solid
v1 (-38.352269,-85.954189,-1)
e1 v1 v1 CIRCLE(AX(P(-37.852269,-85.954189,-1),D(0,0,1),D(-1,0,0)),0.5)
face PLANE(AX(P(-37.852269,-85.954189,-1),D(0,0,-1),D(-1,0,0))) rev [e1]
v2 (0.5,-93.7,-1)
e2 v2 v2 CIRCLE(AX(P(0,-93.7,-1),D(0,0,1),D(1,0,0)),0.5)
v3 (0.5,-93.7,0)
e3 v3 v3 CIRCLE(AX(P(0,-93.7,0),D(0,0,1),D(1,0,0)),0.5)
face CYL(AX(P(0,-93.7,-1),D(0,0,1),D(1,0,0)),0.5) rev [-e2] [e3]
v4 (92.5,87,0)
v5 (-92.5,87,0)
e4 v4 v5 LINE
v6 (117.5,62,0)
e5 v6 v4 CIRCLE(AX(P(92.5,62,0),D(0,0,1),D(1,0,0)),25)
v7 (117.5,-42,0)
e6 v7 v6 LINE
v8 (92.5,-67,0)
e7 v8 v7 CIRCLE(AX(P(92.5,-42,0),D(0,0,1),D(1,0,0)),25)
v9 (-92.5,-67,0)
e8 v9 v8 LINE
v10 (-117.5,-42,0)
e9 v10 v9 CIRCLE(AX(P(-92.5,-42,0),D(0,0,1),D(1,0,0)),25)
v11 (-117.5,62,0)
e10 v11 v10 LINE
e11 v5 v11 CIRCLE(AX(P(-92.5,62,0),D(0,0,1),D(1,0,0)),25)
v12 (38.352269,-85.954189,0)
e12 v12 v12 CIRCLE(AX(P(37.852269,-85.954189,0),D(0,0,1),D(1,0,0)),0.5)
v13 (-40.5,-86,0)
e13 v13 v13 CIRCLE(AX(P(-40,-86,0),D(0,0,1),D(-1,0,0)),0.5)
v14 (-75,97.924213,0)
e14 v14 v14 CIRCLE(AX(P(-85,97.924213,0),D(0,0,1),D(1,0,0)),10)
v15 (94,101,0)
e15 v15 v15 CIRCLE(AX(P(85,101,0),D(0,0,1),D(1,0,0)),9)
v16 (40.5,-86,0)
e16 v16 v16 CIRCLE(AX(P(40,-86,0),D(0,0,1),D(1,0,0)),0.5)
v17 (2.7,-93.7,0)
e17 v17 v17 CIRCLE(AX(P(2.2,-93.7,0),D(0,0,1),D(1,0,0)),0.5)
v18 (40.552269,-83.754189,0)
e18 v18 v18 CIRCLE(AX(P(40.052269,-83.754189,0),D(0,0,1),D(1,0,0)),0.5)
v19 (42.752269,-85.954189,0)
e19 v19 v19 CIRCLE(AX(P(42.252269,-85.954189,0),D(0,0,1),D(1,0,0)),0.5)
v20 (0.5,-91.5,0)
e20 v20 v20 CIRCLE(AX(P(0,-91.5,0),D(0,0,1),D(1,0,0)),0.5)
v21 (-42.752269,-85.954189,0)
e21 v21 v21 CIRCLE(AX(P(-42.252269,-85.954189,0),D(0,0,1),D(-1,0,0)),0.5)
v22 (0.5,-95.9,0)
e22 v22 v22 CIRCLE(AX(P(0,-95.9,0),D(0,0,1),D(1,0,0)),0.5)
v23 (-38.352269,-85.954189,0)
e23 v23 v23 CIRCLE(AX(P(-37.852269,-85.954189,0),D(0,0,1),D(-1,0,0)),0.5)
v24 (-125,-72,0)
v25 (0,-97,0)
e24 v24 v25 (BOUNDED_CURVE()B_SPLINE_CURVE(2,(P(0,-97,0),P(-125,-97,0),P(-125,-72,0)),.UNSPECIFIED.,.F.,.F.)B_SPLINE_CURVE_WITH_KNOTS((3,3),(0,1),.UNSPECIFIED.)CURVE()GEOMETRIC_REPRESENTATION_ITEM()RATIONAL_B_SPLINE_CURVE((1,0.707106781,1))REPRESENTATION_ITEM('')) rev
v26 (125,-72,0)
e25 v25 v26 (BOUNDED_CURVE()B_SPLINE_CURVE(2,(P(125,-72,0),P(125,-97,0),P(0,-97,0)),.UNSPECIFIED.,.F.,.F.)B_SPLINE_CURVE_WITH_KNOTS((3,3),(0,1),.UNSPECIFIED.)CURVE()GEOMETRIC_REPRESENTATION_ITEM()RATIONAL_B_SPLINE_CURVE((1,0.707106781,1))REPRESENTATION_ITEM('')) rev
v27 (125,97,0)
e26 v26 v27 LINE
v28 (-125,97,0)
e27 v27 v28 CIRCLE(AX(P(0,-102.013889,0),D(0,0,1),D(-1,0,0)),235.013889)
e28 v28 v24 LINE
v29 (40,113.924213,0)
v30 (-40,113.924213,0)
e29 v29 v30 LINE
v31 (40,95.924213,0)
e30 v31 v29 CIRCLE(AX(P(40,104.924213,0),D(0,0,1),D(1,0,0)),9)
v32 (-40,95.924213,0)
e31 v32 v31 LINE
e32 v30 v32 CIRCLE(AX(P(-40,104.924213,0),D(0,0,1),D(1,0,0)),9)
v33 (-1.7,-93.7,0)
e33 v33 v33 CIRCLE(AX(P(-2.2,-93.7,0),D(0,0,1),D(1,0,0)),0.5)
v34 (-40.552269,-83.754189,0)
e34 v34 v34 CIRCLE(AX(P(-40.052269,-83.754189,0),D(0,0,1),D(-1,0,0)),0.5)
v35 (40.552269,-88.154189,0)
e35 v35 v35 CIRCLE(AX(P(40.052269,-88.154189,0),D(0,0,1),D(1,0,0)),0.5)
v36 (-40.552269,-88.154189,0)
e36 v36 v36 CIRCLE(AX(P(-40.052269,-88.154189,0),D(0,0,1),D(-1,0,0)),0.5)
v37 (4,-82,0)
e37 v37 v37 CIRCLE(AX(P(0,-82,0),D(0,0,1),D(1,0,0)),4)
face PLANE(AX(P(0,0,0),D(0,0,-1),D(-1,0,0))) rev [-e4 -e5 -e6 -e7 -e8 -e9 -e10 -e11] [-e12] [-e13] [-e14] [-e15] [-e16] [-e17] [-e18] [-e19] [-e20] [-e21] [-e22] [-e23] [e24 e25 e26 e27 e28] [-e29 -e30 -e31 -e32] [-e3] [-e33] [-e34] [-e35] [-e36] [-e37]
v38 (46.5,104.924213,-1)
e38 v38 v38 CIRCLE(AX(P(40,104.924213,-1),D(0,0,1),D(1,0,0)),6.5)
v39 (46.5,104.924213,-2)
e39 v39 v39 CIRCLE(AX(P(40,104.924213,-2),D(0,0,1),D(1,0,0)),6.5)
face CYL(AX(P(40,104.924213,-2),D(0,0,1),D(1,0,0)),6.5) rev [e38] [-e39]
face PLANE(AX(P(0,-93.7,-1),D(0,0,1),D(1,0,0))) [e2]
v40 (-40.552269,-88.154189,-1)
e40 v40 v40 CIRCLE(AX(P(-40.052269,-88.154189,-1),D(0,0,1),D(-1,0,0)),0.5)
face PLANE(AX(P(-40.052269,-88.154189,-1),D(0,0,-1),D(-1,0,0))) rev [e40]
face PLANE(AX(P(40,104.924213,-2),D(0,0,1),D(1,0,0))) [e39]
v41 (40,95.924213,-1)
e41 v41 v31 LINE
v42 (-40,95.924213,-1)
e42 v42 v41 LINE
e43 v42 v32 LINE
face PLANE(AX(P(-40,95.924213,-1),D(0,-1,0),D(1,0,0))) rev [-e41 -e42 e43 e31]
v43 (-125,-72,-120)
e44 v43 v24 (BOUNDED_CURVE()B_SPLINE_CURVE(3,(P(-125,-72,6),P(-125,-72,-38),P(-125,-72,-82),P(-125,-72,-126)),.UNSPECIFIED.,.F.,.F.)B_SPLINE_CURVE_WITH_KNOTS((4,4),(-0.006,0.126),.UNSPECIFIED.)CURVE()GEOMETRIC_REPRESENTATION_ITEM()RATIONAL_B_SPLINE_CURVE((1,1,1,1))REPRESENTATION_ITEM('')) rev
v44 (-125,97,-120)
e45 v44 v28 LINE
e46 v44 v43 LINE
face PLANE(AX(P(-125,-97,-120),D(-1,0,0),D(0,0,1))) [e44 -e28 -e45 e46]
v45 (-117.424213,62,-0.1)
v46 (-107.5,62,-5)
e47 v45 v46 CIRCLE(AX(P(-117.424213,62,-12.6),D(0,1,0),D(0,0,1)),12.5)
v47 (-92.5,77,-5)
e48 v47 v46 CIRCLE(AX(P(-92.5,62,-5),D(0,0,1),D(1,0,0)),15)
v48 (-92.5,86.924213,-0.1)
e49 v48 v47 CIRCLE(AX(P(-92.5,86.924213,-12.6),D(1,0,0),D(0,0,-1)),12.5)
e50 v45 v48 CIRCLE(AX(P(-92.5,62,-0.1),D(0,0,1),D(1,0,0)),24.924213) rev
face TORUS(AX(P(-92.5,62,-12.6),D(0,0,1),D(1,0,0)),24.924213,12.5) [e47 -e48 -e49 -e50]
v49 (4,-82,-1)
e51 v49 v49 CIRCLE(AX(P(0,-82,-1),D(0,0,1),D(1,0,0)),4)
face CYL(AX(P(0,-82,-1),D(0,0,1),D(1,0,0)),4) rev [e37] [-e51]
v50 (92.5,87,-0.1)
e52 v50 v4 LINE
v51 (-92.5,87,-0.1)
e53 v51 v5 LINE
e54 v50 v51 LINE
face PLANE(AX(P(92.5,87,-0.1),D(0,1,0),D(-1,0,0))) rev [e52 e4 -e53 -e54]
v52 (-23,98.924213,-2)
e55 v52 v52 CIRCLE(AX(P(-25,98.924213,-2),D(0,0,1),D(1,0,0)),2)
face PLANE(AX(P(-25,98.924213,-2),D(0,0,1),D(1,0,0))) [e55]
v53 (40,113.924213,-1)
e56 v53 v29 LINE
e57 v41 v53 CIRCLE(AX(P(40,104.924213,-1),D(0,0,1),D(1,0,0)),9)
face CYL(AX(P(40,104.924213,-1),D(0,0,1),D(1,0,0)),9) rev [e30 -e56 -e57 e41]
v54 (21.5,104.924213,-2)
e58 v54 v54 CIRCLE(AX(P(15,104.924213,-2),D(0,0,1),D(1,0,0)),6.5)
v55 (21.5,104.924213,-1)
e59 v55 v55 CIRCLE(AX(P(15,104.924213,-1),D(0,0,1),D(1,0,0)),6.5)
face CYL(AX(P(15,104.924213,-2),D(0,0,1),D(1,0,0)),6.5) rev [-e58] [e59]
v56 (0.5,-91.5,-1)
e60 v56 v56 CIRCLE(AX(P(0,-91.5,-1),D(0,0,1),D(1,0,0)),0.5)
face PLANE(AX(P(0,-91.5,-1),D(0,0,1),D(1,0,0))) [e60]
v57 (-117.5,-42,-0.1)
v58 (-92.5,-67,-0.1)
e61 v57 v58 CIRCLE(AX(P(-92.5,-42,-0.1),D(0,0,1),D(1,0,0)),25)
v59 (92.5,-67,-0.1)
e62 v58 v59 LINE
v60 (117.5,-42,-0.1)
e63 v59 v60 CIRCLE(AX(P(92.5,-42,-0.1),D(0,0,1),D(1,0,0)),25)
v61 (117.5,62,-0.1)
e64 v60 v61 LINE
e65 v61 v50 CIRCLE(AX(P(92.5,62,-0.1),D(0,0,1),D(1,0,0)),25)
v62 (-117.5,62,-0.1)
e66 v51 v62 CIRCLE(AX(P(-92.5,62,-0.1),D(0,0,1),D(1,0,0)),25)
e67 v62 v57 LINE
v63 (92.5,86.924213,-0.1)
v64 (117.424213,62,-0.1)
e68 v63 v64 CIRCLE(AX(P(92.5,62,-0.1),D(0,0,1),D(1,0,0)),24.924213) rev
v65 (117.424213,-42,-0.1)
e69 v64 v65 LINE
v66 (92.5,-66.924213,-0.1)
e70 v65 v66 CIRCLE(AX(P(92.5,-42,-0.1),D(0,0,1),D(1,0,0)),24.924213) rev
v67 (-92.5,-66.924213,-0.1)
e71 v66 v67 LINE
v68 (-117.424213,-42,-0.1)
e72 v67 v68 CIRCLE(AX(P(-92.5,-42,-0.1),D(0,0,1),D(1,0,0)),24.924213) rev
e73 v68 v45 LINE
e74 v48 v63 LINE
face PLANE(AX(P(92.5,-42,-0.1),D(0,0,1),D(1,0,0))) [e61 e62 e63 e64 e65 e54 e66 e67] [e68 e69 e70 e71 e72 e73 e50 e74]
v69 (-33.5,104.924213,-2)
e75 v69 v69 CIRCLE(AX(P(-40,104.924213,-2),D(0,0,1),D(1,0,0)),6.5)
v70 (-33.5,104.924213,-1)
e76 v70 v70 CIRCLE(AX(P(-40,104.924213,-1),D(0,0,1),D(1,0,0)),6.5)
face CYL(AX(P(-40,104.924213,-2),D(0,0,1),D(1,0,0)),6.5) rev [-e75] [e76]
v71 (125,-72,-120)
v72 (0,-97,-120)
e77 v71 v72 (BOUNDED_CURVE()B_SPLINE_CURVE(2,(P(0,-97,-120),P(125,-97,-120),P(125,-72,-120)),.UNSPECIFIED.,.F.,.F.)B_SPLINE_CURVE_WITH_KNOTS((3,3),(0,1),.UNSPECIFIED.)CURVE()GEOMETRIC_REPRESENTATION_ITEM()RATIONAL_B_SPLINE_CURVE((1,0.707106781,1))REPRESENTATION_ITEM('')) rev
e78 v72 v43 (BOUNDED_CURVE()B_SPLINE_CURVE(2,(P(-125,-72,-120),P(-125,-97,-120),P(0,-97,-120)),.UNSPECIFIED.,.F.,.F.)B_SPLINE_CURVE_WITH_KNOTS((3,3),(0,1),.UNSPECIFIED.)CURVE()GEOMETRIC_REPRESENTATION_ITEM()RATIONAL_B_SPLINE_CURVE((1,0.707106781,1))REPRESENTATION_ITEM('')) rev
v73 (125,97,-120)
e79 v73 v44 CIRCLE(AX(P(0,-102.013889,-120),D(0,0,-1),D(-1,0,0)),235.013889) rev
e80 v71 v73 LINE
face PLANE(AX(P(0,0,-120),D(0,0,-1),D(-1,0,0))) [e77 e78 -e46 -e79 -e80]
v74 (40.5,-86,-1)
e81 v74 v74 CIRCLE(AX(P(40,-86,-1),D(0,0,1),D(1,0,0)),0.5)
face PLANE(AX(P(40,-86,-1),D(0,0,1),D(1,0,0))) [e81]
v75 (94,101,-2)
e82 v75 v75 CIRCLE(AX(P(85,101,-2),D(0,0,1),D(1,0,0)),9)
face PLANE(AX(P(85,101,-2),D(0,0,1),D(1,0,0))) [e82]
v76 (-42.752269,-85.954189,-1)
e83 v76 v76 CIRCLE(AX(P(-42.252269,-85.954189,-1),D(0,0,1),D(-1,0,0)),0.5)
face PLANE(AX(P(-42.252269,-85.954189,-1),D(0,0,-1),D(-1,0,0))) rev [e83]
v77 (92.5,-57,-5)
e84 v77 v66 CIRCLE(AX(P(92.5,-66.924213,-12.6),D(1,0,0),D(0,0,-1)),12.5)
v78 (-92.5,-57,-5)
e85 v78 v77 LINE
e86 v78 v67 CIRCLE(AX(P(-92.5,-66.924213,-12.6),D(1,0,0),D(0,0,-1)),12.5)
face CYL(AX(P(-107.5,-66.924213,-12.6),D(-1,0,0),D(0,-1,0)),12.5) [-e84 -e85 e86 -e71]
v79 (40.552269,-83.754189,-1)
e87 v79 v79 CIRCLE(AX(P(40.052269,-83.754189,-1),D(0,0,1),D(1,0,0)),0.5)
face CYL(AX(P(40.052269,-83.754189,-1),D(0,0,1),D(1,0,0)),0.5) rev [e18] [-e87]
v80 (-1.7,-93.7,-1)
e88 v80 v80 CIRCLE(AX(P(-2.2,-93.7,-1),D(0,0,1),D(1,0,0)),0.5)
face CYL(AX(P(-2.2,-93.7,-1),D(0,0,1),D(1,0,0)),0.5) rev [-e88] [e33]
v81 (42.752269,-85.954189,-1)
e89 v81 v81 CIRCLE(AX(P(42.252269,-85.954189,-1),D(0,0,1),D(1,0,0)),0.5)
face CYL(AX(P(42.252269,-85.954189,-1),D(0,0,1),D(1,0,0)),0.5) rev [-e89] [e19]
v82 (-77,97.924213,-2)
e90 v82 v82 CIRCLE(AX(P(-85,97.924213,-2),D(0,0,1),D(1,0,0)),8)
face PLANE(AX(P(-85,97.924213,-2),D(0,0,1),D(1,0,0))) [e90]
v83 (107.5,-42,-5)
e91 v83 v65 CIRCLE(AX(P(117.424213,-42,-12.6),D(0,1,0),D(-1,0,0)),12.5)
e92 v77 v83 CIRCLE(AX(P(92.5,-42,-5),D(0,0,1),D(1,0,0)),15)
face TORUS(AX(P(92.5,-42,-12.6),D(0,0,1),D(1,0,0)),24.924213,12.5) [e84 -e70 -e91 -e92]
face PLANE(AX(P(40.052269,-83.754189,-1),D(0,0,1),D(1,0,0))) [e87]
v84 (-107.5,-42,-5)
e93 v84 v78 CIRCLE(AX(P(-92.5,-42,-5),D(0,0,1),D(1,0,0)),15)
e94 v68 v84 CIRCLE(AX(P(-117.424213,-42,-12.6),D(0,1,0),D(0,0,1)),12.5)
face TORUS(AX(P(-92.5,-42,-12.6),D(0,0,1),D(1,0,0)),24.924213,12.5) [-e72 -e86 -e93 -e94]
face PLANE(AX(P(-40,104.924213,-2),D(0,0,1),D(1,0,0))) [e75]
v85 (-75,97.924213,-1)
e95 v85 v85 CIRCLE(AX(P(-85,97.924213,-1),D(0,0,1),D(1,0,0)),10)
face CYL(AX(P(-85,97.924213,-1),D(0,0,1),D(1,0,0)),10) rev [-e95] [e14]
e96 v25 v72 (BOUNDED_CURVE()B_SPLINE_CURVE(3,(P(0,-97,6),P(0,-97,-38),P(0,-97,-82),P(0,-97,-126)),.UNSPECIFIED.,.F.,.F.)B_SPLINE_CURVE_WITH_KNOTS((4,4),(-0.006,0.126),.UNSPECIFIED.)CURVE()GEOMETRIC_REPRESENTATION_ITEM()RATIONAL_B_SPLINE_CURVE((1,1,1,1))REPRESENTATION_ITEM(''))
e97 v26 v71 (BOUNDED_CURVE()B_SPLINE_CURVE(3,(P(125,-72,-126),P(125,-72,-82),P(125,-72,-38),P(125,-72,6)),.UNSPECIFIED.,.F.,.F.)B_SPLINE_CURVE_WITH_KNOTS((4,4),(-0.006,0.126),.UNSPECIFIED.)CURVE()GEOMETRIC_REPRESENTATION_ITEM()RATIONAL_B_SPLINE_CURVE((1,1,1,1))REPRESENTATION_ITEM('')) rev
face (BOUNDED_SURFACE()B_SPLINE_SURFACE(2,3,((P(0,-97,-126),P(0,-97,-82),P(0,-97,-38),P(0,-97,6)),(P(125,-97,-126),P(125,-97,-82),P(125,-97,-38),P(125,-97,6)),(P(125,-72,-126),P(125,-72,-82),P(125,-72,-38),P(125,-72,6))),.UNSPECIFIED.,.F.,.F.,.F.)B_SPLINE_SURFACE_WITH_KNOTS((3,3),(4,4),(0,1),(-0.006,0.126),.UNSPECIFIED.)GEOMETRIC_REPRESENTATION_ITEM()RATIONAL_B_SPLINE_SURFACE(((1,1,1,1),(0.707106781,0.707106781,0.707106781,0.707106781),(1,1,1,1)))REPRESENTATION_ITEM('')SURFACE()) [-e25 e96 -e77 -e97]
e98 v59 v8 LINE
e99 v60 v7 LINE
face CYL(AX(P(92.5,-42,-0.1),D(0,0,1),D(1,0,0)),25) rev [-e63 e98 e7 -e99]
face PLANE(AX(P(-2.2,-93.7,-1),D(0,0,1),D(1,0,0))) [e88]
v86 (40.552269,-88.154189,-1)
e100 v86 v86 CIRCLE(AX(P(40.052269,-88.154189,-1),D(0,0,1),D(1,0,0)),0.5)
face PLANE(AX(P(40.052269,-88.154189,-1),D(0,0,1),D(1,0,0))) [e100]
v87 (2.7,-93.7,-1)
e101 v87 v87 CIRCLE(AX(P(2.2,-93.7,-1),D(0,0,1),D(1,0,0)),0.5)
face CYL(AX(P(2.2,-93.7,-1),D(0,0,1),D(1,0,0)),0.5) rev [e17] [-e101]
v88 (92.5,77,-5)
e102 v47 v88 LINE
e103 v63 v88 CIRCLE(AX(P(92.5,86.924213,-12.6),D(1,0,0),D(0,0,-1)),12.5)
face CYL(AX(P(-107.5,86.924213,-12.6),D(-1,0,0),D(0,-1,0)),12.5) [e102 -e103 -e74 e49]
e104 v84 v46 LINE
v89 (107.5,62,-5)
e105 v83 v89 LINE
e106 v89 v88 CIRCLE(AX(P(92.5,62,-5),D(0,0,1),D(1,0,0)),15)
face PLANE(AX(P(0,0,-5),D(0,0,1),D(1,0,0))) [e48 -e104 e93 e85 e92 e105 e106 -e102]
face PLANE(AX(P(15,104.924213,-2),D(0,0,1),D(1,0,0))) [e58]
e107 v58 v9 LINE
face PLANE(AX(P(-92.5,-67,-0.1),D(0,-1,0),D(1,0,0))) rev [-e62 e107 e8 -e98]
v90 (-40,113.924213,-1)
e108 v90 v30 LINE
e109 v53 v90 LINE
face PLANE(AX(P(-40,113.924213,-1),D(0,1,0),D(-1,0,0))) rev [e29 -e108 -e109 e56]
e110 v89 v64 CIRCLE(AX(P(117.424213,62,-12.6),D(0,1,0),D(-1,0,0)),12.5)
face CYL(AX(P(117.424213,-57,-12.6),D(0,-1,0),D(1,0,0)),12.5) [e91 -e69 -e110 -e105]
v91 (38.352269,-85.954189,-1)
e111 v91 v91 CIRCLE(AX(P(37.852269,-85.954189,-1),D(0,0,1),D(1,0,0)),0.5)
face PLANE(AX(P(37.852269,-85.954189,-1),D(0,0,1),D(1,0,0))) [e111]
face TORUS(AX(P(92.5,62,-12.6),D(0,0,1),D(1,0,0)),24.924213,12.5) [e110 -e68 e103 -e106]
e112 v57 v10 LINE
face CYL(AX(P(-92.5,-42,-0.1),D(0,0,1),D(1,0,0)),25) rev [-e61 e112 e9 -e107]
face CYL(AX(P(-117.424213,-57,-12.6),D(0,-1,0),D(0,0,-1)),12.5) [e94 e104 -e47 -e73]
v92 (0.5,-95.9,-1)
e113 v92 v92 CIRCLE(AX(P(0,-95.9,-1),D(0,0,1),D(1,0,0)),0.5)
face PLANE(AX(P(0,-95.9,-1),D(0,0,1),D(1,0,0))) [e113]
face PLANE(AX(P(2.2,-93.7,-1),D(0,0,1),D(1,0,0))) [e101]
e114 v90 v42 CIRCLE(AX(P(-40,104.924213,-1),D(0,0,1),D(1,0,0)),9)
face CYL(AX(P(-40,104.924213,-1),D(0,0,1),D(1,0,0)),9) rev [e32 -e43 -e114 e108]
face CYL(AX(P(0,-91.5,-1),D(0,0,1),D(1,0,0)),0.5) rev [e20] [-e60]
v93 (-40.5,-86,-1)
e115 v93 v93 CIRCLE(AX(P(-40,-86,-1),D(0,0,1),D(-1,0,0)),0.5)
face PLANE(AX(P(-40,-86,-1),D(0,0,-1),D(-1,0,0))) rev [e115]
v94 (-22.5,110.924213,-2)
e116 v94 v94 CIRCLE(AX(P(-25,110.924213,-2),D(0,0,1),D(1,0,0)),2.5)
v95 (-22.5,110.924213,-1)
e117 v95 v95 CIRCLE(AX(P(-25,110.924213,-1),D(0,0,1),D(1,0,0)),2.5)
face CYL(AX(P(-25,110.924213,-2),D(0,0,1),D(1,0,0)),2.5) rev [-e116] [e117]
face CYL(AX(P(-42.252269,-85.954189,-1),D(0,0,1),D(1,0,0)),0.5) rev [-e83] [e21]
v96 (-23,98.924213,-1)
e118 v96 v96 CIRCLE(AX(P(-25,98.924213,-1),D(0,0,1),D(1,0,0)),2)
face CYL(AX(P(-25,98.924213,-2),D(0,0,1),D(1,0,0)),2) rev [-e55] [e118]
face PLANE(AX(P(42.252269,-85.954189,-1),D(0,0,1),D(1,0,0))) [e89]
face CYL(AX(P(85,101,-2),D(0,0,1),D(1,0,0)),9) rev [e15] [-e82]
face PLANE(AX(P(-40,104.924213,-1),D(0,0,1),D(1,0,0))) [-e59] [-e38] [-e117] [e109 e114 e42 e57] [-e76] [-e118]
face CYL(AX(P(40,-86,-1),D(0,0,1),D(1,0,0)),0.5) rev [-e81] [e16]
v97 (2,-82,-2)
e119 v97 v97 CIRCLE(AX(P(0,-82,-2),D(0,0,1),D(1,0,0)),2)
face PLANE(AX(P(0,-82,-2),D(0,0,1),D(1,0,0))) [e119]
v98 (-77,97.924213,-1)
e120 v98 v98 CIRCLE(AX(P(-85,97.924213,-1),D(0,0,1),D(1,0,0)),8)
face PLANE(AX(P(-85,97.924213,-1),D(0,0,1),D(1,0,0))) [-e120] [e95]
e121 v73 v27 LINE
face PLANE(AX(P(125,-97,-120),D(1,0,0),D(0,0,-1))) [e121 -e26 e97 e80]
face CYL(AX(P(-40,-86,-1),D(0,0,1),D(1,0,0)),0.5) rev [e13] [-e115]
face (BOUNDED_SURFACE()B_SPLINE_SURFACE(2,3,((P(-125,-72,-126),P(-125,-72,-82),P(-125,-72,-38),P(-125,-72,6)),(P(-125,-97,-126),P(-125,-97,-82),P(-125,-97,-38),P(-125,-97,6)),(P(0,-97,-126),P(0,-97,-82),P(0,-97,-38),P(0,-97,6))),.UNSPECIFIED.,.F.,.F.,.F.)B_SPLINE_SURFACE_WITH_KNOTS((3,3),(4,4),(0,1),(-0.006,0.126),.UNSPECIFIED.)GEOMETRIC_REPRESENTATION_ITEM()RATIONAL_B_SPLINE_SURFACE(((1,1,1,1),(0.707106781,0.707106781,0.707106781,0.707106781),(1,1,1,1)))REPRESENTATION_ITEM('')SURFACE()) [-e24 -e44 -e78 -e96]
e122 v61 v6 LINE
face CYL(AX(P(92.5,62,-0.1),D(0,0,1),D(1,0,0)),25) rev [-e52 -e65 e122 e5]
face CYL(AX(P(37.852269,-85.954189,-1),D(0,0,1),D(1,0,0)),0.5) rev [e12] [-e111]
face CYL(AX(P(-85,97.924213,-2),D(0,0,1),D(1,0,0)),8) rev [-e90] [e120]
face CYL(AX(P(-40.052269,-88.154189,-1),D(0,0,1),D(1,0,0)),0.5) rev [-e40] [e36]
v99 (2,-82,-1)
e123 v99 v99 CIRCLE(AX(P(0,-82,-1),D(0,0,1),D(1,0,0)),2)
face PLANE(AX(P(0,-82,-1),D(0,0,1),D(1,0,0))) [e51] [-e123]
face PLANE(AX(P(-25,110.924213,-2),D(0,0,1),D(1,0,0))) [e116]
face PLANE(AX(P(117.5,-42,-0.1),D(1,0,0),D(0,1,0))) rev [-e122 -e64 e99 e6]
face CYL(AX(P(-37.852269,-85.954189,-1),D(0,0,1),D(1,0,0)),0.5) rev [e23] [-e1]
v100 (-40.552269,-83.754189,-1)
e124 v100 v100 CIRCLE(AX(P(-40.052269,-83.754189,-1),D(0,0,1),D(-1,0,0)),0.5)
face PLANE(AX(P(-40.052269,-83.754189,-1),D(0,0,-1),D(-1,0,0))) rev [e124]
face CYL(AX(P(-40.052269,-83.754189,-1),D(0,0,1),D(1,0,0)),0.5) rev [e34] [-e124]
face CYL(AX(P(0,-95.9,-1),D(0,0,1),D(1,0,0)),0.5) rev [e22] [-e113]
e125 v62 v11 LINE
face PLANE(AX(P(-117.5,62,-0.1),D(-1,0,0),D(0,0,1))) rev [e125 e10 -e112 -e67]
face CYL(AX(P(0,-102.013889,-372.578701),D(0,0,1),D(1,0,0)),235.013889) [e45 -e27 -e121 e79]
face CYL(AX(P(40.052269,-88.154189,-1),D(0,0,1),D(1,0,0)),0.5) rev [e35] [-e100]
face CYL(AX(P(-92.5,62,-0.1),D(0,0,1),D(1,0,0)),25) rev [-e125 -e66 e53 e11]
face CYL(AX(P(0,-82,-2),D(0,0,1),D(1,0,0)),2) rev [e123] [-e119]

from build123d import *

# Parameters (mm, degrees)
ESBO_O1_W                = 250
ESBO_O1_H                = 194
RESSALTO_EXTRUS_O1_DEPTH = 120
ESBO_O2_W                = 215
ESBO_O2_H                = 134
CORTE_EXTRUS_O1_DEPTH    = 5
FILETE1_R                = 15
RESSALTO_EXTRUS_O2_DEPTH = 120
CORTE_EXTRUS_O2_DEPTH    = 0.1
FILETE2_SIZE             = 125
FILETE2_SIZE_2           = 25
ESBO_O7_R                = 4
CORTE_EXTRUS_O3_DEPTH    = 1
ESBO_O8_R                = 2
CORTE_EXTRUS_O4_DEPTH    = 1
ESBO_O9_R                = 0.5
CORTE_EXTRUS_O5_DEPTH    = 1
FILETE4_R                = 12.5
ESBO_O10_R               = 10
CORTE_EXTRUS_O6_DEPTH    = 1
ESBO_O11_R               = 6.5
ESBO_O11_R_2             = 2.5
ESBO_O11_R_3             = 2
ESBO_O11_R_4             = 8
CORTE_EXTRUS_O7_DEPTH    = 1
ESBO_O14_R               = 9
CORTE_EXTRUS_O9_DEPTH    = 2


with BuildPart() as part:
    # Esboço1 → Ressalto-extrusão1 (new body)
    with BuildSketch(Plane.XY):
        Rectangle(ESBO_O1_W, ESBO_O1_H)
    extrude(amount=-RESSALTO_EXTRUS_O1_DEPTH)

    # Esboço2 → Corte-extrusão1 (cut)
    with BuildSketch(Plane.XY):
        with Locations((0, 10)):
            Rectangle(ESBO_O2_W, ESBO_O2_H)
    extrude(amount=-CORTE_EXTRUS_O1_DEPTH, mode=Mode.SUBTRACT)

    # Filete1
    filete1_edges = [part.edges().sort_by_distance(p)[0] for p in [
        (-107.5, 77, -2.5),
        (107.5, 77, -2.5),
        (107.5, -57, -2.5),
        (-107.5, -57, -2.5),
    ]]
    fillet(filete1_edges, radius=FILETE1_R)

    # Esboço3 → Ressalto-extrusão2 (add)
    with BuildSketch(Plane.XY):
        with BuildLine():
            Line((-125, 97), (125, 97))
            ThreePointArc((125, 97), (0, 133), (-125, 97))
        make_face()
    extrude(amount=-RESSALTO_EXTRUS_O2_DEPTH)

    # Esboço4 → Corte-extrusão2 (cut)
    with BuildSketch(Plane.XY):
        with BuildLine():
            Line((117.5, -42), (117.5, 62))
            ThreePointArc((117.5, 62), (110.17766953, 79.67766953), (92.5, 87))
            Line((92.5, 87), (-92.5, 87))
            ThreePointArc((-92.5, 87), (-110.17766953, 79.67766953), (-117.5, 62))
            Line((-117.5, 62), (-117.5, -42))
            ThreePointArc((-117.5, -42), (-110.17766953, -59.67766953), (-92.5, -67))
            Line((-92.5, -67), (92.5, -67))
            ThreePointArc((92.5, -67), (110.17766953, -59.67766953), (117.5, -42))
        make_face()
    extrude(amount=-CORTE_EXTRUS_O2_DEPTH, mode=Mode.SUBTRACT)

    # Filete2
    # a fillet whose section is not a circle: 125, 25 mm, written as the material it takes off along each edge
    with BuildSketch(Plane(origin=(125, -97, 312.5), x_dir=(-1, 0, 0), z_dir=(0, 0, -1))) as filete2_piece_1:
        with BuildLine():
            Bezier((FILETE2_SIZE, 0), (0, 0), (0, FILETE2_SIZE_2), weights=[1, 0.707106781, 1])
            Line((0, FILETE2_SIZE_2), (0, 0))
            Line((0, 0), (FILETE2_SIZE, 0))
        make_face()
    extrude(amount=745, mode=Mode.SUBTRACT)
    with BuildSketch(Plane(origin=(-125, -97, 312.5), x_dir=(1, 0, 0), z_dir=(0, 0, -1))) as filete2_piece_2:
        with BuildLine():
            Bezier((FILETE2_SIZE, 0), (0, 0), (0, -FILETE2_SIZE_2), weights=[1, 0.707106781, 1])
            Line((0, -FILETE2_SIZE_2), (0, 0))
            Line((0, 0), (FILETE2_SIZE, 0))
        make_face()
    extrude(amount=745, mode=Mode.SUBTRACT)

    # Esboço7 → Corte-extrusão3 (cut)
    with BuildSketch(Plane.XY):
        with Locations((0, -82)):
            Circle(ESBO_O7_R)
    extrude(amount=-CORTE_EXTRUS_O3_DEPTH, mode=Mode.SUBTRACT)

    # Esboço8 → Corte-extrusão4 (cut)
    with BuildSketch(Plane.XY.offset(-1)):
        with Locations((0, -82)):
            Circle(ESBO_O8_R)
    extrude(amount=-CORTE_EXTRUS_O4_DEPTH, mode=Mode.SUBTRACT)

    # Esboço9 → Corte-extrusão5 (cut)
    with BuildSketch(Plane.XY):
        with Locations((0, -91.5)):
            Circle(ESBO_O9_R)
        with Locations((0, -93.7)):
            Circle(ESBO_O9_R)
        with Locations((0, -95.9)):
            Circle(ESBO_O9_R)
        with Locations((2.2, -93.7)):
            Circle(ESBO_O9_R)
        with Locations((-2.2, -93.7)):
            Circle(ESBO_O9_R)
        with Locations((40.052268552, -83.754189239)):
            Circle(ESBO_O9_R)
        with Locations((40.052268552, -88.154189239)):
            Circle(ESBO_O9_R)
        with Locations((42.252268552, -85.954189239)):
            Circle(ESBO_O9_R)
        with Locations((37.852268552, -85.954189239)):
            Circle(ESBO_O9_R)
        with Locations((40, -86)):
            Circle(ESBO_O9_R)
        with Locations(Location((-42.252268552, -85.954189239, 0), (0, 0, 180))):
            Circle(ESBO_O9_R)
        with Locations(Location((-40.052268552, -83.754189239, 0), (0, 0, 180))):
            Circle(ESBO_O9_R)
        with Locations(Location((-40, -86, 0), (0, 0, 180))):
            Circle(ESBO_O9_R)
        with Locations(Location((-37.852268552, -85.954189239, 0), (0, 0, 180))):
            Circle(ESBO_O9_R)
        with Locations(Location((-40.052268552, -88.154189239, 0), (0, 0, 180))):
            Circle(ESBO_O9_R)
    extrude(amount=-CORTE_EXTRUS_O5_DEPTH, mode=Mode.SUBTRACT)

    # Filete4
    # the kernel refuses this fillet: 12.5 mm, written as the material it takes off along each edge
    with BuildSketch(Plane(origin=(92.5, 62, -0.1), x_dir=(0, 1, 0), z_dir=(-1, 0, 0))) as filete4_piece_1:
        with BuildLine():
            CenterArc((24.924212815, 12.5), FILETE4_R, 217.445030013, 52.554969987)
            Line((15, 4.9), (15, 0))
            Line((15, 0), (24.924212815, 0))
        make_face()
    revolve(axis=Axis((92.5, 62, -0.1), (0, 0, -1)), revolution_arc=90, mode=Mode.SUBTRACT)
    with BuildSketch(Plane(origin=(-92.5, 77, -0.1), x_dir=(0, 1, 0), z_dir=(1, 0, 0)), Plane(origin=(92.5, -57, -0.1), x_dir=(0, -1, 0), z_dir=(-1, 0, 0))) as filete4_piece_2:
        with BuildLine():
            CenterArc((9.924212815, -12.5), FILETE4_R, 90, 52.554969987)
            Line((0, -4.9), (0, 0))
            Line((0, 0), (9.924212815, 0))
        make_face()
    extrude(amount=185, mode=Mode.SUBTRACT)
    with BuildSketch(Plane(origin=(-92.5, 62, -0.1), x_dir=(-1, 0, 0), z_dir=(0, -1, 0))) as filete4_piece_3:
        with BuildLine():
            CenterArc((24.924212815, 12.5), FILETE4_R, 217.445030013, 52.554969987)
            Line((15, 4.9), (15, 0))
            Line((15, 0), (24.924212815, 0))
        make_face()
    revolve(axis=Axis((-92.5, 62, -0.1), (0, 0, -1)), revolution_arc=90, mode=Mode.SUBTRACT)
    with BuildSketch(Plane(origin=(-107.5, -42, -0.1), x_dir=(-1, 0, 0), z_dir=(0, 1, 0)), Plane(origin=(107.5, 62, -0.1), x_dir=(1, 0, 0), z_dir=(0, -1, 0))) as filete4_piece_4:
        with BuildLine():
            CenterArc((9.924212815, -12.5), FILETE4_R, 90, 52.554969987)
            Line((0, -4.9), (0, 0))
            Line((0, 0), (9.924212815, 0))
        make_face()
    extrude(amount=104, mode=Mode.SUBTRACT)
    with BuildSketch(Plane(origin=(-92.5, -42, -0.1), x_dir=(0, -1, 0), z_dir=(1, 0, 0))) as filete4_piece_5:
        with BuildLine():
            CenterArc((24.924212815, 12.5), FILETE4_R, 217.445030013, 52.554969987)
            Line((15, 4.9), (15, 0))
            Line((15, 0), (24.924212815, 0))
        make_face()
    revolve(axis=Axis((-92.5, -42, -0.1), (0, 0, -1)), revolution_arc=90, mode=Mode.SUBTRACT)
    with BuildSketch(Plane(origin=(92.5, -42, -0.1), x_dir=(1, 0, 0), z_dir=(0, 1, 0))) as filete4_piece_6:
        with BuildLine():
            CenterArc((24.924212815, 12.5), FILETE4_R, 217.445030013, 52.554969987)
            Line((15, 4.9), (15, 0))
            Line((15, 0), (24.924212815, 0))
        make_face()
    revolve(axis=Axis((92.5, -42, -0.1), (0, 0, -1)), revolution_arc=90, mode=Mode.SUBTRACT)

    # Esboço10 → Corte-extrusão6 (cut)
    with BuildSketch(Plane.XY):
        with Locations((-85, 97.924212815)):
            Circle(ESBO_O10_R)
        with BuildLine():
            Line((-40, 113.924212815), (40, 113.924212815))
            ThreePointArc((40, 113.924212815), (49, 104.924212815), (40, 95.924212815))
            Line((40, 95.924212815), (-40, 95.924212815))
            ThreePointArc((-40, 95.924212815), (-49, 104.924212815), (-40, 113.924212815))
        make_face()
    extrude(amount=-CORTE_EXTRUS_O6_DEPTH, mode=Mode.SUBTRACT)

    # Esboço11 → Corte-extrusão7 (cut)
    with BuildSketch(Plane.XY.offset(-1)):
        with Locations((-40, 104.924212815)):
            Circle(ESBO_O11_R)
        with Locations((40, 104.924212815)):
            Circle(ESBO_O11_R)
        with Locations((15, 104.924212815)):
            Circle(ESBO_O11_R)
        with Locations((-25, 110.924212815)):
            Circle(ESBO_O11_R_2)
        with Locations((-25, 98.924212815)):
            Circle(ESBO_O11_R_3)
        with Locations((-85, 97.924212815)):
            Circle(ESBO_O11_R_4)
    extrude(amount=-CORTE_EXTRUS_O7_DEPTH, mode=Mode.SUBTRACT)

    # Esboço14 → Corte-extrusão9 (cut)
    with BuildSketch(Plane.XY):
        with Locations((85, 101)):
            Circle(ESBO_O14_R)
    extrude(amount=-CORTE_EXTRUS_O9_DEPTH, mode=Mode.SUBTRACT)


solid = part.part
